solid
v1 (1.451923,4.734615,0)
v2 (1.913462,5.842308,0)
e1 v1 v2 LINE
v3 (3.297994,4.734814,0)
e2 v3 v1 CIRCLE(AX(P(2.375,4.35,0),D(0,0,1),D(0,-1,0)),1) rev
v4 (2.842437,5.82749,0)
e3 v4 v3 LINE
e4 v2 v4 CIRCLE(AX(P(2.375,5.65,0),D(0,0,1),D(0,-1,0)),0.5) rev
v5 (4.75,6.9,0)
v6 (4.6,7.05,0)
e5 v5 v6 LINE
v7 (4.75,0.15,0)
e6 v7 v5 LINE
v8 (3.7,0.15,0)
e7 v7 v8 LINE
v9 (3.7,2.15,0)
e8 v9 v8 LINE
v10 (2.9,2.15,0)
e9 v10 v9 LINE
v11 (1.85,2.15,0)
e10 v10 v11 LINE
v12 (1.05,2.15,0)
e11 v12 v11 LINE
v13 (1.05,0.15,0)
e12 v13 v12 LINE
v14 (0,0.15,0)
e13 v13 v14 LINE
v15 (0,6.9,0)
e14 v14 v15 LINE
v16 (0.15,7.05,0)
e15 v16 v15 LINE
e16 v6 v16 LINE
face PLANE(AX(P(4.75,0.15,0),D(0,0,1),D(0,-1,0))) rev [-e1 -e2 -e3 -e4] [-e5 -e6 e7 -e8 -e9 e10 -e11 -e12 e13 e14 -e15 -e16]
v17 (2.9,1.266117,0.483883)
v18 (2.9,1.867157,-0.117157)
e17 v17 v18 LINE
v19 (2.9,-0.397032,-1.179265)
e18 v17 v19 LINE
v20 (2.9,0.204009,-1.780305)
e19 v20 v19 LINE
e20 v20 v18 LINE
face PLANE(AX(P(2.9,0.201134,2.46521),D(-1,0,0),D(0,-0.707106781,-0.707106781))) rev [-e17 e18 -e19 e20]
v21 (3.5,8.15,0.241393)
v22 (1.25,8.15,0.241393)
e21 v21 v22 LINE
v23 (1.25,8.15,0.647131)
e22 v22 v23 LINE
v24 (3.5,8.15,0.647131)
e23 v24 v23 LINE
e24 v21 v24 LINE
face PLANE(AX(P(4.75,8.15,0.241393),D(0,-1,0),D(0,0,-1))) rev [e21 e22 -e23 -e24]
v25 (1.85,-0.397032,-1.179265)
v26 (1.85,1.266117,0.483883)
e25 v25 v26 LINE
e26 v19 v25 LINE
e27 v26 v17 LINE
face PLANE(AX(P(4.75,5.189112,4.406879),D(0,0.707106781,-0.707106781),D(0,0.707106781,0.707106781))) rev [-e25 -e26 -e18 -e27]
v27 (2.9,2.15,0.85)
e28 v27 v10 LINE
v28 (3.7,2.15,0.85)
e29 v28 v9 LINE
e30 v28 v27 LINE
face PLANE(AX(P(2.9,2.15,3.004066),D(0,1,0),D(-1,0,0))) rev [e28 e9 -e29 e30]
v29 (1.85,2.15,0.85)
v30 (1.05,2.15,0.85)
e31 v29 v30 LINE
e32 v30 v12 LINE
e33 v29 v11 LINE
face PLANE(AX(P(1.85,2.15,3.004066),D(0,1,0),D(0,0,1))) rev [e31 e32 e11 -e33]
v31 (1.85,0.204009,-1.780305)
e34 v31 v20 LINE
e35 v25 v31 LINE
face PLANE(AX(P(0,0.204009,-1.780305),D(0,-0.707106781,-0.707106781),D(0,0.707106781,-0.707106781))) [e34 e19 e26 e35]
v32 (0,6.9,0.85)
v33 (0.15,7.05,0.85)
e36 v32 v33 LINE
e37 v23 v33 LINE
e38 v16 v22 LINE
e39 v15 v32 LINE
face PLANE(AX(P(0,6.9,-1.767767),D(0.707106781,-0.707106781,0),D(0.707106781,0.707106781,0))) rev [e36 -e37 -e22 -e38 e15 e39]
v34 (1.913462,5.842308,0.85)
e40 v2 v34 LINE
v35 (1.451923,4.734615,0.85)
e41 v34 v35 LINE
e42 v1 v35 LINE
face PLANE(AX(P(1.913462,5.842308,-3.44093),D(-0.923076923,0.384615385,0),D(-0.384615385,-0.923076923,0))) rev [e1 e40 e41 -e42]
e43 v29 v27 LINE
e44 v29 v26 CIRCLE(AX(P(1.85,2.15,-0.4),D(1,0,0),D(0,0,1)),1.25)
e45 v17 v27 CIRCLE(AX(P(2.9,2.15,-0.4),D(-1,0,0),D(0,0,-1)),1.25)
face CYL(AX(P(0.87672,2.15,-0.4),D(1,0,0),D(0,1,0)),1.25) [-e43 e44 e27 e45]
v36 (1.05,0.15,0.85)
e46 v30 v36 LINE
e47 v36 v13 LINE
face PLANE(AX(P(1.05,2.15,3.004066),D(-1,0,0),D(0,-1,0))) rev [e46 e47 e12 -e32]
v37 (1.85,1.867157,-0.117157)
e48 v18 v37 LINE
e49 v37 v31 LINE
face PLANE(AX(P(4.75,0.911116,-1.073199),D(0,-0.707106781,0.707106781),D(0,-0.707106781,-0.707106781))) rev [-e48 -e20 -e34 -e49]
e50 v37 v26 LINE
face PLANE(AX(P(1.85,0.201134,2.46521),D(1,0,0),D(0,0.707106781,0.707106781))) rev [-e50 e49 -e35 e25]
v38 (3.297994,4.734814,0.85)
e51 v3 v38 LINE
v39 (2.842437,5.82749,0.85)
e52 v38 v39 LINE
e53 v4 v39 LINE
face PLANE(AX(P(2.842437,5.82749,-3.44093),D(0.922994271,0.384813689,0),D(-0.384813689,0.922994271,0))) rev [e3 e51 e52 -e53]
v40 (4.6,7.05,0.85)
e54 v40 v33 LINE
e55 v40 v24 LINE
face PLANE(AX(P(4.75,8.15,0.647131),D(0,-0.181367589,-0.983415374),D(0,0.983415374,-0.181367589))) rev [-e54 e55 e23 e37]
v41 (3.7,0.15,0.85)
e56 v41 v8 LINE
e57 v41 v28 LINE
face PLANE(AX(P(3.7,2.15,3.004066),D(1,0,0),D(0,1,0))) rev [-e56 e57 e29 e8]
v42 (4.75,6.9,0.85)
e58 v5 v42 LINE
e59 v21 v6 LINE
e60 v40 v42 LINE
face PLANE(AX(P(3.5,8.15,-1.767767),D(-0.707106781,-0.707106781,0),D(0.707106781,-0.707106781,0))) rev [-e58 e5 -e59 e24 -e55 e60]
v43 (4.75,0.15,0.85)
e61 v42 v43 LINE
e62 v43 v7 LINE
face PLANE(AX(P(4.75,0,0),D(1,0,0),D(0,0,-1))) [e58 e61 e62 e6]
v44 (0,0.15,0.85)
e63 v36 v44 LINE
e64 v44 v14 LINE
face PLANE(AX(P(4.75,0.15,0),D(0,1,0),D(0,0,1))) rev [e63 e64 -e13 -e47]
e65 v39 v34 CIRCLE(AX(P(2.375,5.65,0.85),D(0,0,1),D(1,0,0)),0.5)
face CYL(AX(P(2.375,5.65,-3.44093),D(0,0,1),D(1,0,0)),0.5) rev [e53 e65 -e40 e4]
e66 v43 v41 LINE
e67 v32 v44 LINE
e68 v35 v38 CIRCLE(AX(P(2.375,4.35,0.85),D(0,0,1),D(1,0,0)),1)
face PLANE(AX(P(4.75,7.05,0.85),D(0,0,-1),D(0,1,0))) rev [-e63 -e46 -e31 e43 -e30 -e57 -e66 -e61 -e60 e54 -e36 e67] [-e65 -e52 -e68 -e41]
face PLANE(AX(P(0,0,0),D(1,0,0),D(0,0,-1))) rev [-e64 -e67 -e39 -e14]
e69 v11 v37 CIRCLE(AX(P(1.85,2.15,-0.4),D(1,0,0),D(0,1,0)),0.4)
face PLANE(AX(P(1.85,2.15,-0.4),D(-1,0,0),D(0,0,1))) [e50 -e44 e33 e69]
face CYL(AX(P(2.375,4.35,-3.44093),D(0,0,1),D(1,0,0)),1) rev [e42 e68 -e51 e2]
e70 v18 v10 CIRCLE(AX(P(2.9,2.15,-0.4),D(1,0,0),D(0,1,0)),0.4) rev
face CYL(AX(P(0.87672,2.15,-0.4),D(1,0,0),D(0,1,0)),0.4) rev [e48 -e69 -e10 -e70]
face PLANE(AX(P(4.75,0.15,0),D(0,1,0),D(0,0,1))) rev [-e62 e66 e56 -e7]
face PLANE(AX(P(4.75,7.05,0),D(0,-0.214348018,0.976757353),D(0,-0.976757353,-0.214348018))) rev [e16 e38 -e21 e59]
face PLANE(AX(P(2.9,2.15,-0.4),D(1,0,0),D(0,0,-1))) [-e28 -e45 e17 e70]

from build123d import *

# Parameters (mm, degrees)
BOSS_EXTRUDE1_DEPTH    = 4.75
CUT_EXTRUDE1_REACH     = 11.471
CUT_EXTRUDE2_DEPTH     = 0.85
SKETCH6_W              = 0.8
SKETCH6_H              = 2
CUT_EXTRUDE3_DEPTH     = 0.85
SKETCH7_W              = 1.05
SKETCH7_H              = 0.85
BOSS_EXTRUDE2_DEPTH    = 1
SKETCHED_START         = 1.85
SKETCHED_BEND1_DEPTH   = 1.05
SKETCHED_BEND1_2_DEPTH = 1.05


# Read off the part's stored shape, not the designer's step: Sketched Bend1
with BuildPart() as part:
    # Sketch1 → Boss-Extrude1 (new body)
    with BuildSketch(Plane(origin=(0, 0, 0), x_dir=(0, 0, -1), z_dir=(1, 0, 0))):
        Polygon((0, 0.15), (0, 7.05), (-0.241393443, 8.15), (-0.647131148, 8.15), (-0.85, 7.05), (-0.85, 0.15), align=None)
    extrude(amount=BOSS_EXTRUDE1_DEPTH)

    # Cut-Extrude1: up to this face of the body (flat: up to its plane)
    cut_extrude1_end = Plane(part.part.faces().sort_by_distance((2.375, 3.6, 0))[0])
    # Sketch4 → Cut-Extrude1 (cut, up to the picked face)
    with BuildSketch(Plane.XY.offset(0.85), mode=Mode.PRIVATE) as cut_extrude1_sk1:
        Polygon((0, 6.9), (1.25, 8.15), (0, 8.15), align=None)
    cut_extrude1_tool1 = split(extrude(cut_extrude1_sk1.sketch, amount=-CUT_EXTRUDE1_REACH, mode=Mode.PRIVATE), bisect_by=cut_extrude1_end, keep=Keep.BOTH, mode=Mode.PRIVATE)
    # Sketch4 → Cut-Extrude1 (cut, up to the picked face)
    with BuildSketch(Plane.XY.offset(0.85), mode=Mode.PRIVATE) as cut_extrude1_sk2:
        Polygon((3.5, 8.15), (4.75, 6.9), (4.75, 8.15), align=None)
    cut_extrude1_tool2 = split(extrude(cut_extrude1_sk2.sketch, amount=-CUT_EXTRUDE1_REACH, mode=Mode.PRIVATE), bisect_by=cut_extrude1_end, keep=Keep.BOTH, mode=Mode.PRIVATE)
    add(cut_extrude1_tool1.solids().sort_by(Axis((0.416667, 7.733333, 0.85), (0, 0, -1)))[0], mode=Mode.SUBTRACT)
    add(cut_extrude1_tool2.solids().sort_by(Axis((4.333333, 7.733333, 0.85), (0, 0, -1)))[0], mode=Mode.SUBTRACT)

    # Sketch5 → Cut-Extrude2 (cut)
    with BuildSketch(Plane.XY.offset(0.85)):
        with BuildLine():
            Line((1.913461538, 5.842307692), (1.451923077, 4.734615385))
            ThreePointArc((1.451923077, 4.734615385), (2.37510742, 3.350000006), (3.297994271, 4.734813689))
            Line((3.297994271, 4.734813689), (2.842436975, 5.827489929))
            ThreePointArc((2.842436975, 5.827489929), (2.382974312, 6.149936406), (1.913461538, 5.842307692))
        make_face()
    extrude(amount=-CUT_EXTRUDE2_DEPTH, mode=Mode.SUBTRACT)

    # Sketch6 → Cut-Extrude3 (cut)
    with BuildSketch(Plane(origin=(0, 0, 0), x_dir=(-1, 0, 0), z_dir=(0, 0, -1))):
        with Locations((-3.3, 1.15)):
            Rectangle(SKETCH6_W, SKETCH6_H)
        with Locations((-1.45, 1.15)):
            Rectangle(SKETCH6_W, SKETCH6_H)
    extrude(amount=-CUT_EXTRUDE3_DEPTH, mode=Mode.SUBTRACT)

    # Sketch7 → Boss-Extrude2 (add)
    with BuildSketch(Plane.XZ.offset(-0.15)):
        with Locations((2.375, 0.425)):
            Rectangle(SKETCH7_W, SKETCH7_H)
    extrude(amount=BOSS_EXTRUDE2_DEPTH)

    # Sketched Bend1 outline → Sketched Bend1 (cut)
    with BuildSketch(Plane.YZ.offset(SKETCHED_START)):
        with BuildLine():
            ThreePointArc((1.266116524, 0.483883476), (1.67164571, 0.754849416), (2.15, 0.85))
            Line((2.15, 0.85), (-0.85, 0.85))
            Line((-0.85, 0.85), (-0.85, 0))
            Line((-0.85, 0), (0.782233048, 0))
            Line((0.782233048, 0), (1.266116524, 0.483883476))
        make_face()
    extrude(amount=SKETCHED_BEND1_DEPTH, mode=Mode.SUBTRACT)

    # Sketched Bend1 2 outline → Sketched Bend1 2 (add)
    with BuildSketch(Plane.YZ.offset(SKETCHED_START)):
        with BuildLine():
            Line((2.15, 0), (0.782233048, 0))
            Line((0.782233048, 0), (-0.397031517, -1.179264564))
            Line((-0.397031517, -1.179264564), (0.204009247, -1.780305328))
            Line((0.204009247, -1.780305328), (1.867157288, -0.117157288))
            ThreePointArc((1.867157288, -0.117157288), (1.996926627, -0.030448187), (2.15, 0))
        make_face()
    extrude(amount=SKETCHED_BEND1_2_DEPTH)


solid = part.part
